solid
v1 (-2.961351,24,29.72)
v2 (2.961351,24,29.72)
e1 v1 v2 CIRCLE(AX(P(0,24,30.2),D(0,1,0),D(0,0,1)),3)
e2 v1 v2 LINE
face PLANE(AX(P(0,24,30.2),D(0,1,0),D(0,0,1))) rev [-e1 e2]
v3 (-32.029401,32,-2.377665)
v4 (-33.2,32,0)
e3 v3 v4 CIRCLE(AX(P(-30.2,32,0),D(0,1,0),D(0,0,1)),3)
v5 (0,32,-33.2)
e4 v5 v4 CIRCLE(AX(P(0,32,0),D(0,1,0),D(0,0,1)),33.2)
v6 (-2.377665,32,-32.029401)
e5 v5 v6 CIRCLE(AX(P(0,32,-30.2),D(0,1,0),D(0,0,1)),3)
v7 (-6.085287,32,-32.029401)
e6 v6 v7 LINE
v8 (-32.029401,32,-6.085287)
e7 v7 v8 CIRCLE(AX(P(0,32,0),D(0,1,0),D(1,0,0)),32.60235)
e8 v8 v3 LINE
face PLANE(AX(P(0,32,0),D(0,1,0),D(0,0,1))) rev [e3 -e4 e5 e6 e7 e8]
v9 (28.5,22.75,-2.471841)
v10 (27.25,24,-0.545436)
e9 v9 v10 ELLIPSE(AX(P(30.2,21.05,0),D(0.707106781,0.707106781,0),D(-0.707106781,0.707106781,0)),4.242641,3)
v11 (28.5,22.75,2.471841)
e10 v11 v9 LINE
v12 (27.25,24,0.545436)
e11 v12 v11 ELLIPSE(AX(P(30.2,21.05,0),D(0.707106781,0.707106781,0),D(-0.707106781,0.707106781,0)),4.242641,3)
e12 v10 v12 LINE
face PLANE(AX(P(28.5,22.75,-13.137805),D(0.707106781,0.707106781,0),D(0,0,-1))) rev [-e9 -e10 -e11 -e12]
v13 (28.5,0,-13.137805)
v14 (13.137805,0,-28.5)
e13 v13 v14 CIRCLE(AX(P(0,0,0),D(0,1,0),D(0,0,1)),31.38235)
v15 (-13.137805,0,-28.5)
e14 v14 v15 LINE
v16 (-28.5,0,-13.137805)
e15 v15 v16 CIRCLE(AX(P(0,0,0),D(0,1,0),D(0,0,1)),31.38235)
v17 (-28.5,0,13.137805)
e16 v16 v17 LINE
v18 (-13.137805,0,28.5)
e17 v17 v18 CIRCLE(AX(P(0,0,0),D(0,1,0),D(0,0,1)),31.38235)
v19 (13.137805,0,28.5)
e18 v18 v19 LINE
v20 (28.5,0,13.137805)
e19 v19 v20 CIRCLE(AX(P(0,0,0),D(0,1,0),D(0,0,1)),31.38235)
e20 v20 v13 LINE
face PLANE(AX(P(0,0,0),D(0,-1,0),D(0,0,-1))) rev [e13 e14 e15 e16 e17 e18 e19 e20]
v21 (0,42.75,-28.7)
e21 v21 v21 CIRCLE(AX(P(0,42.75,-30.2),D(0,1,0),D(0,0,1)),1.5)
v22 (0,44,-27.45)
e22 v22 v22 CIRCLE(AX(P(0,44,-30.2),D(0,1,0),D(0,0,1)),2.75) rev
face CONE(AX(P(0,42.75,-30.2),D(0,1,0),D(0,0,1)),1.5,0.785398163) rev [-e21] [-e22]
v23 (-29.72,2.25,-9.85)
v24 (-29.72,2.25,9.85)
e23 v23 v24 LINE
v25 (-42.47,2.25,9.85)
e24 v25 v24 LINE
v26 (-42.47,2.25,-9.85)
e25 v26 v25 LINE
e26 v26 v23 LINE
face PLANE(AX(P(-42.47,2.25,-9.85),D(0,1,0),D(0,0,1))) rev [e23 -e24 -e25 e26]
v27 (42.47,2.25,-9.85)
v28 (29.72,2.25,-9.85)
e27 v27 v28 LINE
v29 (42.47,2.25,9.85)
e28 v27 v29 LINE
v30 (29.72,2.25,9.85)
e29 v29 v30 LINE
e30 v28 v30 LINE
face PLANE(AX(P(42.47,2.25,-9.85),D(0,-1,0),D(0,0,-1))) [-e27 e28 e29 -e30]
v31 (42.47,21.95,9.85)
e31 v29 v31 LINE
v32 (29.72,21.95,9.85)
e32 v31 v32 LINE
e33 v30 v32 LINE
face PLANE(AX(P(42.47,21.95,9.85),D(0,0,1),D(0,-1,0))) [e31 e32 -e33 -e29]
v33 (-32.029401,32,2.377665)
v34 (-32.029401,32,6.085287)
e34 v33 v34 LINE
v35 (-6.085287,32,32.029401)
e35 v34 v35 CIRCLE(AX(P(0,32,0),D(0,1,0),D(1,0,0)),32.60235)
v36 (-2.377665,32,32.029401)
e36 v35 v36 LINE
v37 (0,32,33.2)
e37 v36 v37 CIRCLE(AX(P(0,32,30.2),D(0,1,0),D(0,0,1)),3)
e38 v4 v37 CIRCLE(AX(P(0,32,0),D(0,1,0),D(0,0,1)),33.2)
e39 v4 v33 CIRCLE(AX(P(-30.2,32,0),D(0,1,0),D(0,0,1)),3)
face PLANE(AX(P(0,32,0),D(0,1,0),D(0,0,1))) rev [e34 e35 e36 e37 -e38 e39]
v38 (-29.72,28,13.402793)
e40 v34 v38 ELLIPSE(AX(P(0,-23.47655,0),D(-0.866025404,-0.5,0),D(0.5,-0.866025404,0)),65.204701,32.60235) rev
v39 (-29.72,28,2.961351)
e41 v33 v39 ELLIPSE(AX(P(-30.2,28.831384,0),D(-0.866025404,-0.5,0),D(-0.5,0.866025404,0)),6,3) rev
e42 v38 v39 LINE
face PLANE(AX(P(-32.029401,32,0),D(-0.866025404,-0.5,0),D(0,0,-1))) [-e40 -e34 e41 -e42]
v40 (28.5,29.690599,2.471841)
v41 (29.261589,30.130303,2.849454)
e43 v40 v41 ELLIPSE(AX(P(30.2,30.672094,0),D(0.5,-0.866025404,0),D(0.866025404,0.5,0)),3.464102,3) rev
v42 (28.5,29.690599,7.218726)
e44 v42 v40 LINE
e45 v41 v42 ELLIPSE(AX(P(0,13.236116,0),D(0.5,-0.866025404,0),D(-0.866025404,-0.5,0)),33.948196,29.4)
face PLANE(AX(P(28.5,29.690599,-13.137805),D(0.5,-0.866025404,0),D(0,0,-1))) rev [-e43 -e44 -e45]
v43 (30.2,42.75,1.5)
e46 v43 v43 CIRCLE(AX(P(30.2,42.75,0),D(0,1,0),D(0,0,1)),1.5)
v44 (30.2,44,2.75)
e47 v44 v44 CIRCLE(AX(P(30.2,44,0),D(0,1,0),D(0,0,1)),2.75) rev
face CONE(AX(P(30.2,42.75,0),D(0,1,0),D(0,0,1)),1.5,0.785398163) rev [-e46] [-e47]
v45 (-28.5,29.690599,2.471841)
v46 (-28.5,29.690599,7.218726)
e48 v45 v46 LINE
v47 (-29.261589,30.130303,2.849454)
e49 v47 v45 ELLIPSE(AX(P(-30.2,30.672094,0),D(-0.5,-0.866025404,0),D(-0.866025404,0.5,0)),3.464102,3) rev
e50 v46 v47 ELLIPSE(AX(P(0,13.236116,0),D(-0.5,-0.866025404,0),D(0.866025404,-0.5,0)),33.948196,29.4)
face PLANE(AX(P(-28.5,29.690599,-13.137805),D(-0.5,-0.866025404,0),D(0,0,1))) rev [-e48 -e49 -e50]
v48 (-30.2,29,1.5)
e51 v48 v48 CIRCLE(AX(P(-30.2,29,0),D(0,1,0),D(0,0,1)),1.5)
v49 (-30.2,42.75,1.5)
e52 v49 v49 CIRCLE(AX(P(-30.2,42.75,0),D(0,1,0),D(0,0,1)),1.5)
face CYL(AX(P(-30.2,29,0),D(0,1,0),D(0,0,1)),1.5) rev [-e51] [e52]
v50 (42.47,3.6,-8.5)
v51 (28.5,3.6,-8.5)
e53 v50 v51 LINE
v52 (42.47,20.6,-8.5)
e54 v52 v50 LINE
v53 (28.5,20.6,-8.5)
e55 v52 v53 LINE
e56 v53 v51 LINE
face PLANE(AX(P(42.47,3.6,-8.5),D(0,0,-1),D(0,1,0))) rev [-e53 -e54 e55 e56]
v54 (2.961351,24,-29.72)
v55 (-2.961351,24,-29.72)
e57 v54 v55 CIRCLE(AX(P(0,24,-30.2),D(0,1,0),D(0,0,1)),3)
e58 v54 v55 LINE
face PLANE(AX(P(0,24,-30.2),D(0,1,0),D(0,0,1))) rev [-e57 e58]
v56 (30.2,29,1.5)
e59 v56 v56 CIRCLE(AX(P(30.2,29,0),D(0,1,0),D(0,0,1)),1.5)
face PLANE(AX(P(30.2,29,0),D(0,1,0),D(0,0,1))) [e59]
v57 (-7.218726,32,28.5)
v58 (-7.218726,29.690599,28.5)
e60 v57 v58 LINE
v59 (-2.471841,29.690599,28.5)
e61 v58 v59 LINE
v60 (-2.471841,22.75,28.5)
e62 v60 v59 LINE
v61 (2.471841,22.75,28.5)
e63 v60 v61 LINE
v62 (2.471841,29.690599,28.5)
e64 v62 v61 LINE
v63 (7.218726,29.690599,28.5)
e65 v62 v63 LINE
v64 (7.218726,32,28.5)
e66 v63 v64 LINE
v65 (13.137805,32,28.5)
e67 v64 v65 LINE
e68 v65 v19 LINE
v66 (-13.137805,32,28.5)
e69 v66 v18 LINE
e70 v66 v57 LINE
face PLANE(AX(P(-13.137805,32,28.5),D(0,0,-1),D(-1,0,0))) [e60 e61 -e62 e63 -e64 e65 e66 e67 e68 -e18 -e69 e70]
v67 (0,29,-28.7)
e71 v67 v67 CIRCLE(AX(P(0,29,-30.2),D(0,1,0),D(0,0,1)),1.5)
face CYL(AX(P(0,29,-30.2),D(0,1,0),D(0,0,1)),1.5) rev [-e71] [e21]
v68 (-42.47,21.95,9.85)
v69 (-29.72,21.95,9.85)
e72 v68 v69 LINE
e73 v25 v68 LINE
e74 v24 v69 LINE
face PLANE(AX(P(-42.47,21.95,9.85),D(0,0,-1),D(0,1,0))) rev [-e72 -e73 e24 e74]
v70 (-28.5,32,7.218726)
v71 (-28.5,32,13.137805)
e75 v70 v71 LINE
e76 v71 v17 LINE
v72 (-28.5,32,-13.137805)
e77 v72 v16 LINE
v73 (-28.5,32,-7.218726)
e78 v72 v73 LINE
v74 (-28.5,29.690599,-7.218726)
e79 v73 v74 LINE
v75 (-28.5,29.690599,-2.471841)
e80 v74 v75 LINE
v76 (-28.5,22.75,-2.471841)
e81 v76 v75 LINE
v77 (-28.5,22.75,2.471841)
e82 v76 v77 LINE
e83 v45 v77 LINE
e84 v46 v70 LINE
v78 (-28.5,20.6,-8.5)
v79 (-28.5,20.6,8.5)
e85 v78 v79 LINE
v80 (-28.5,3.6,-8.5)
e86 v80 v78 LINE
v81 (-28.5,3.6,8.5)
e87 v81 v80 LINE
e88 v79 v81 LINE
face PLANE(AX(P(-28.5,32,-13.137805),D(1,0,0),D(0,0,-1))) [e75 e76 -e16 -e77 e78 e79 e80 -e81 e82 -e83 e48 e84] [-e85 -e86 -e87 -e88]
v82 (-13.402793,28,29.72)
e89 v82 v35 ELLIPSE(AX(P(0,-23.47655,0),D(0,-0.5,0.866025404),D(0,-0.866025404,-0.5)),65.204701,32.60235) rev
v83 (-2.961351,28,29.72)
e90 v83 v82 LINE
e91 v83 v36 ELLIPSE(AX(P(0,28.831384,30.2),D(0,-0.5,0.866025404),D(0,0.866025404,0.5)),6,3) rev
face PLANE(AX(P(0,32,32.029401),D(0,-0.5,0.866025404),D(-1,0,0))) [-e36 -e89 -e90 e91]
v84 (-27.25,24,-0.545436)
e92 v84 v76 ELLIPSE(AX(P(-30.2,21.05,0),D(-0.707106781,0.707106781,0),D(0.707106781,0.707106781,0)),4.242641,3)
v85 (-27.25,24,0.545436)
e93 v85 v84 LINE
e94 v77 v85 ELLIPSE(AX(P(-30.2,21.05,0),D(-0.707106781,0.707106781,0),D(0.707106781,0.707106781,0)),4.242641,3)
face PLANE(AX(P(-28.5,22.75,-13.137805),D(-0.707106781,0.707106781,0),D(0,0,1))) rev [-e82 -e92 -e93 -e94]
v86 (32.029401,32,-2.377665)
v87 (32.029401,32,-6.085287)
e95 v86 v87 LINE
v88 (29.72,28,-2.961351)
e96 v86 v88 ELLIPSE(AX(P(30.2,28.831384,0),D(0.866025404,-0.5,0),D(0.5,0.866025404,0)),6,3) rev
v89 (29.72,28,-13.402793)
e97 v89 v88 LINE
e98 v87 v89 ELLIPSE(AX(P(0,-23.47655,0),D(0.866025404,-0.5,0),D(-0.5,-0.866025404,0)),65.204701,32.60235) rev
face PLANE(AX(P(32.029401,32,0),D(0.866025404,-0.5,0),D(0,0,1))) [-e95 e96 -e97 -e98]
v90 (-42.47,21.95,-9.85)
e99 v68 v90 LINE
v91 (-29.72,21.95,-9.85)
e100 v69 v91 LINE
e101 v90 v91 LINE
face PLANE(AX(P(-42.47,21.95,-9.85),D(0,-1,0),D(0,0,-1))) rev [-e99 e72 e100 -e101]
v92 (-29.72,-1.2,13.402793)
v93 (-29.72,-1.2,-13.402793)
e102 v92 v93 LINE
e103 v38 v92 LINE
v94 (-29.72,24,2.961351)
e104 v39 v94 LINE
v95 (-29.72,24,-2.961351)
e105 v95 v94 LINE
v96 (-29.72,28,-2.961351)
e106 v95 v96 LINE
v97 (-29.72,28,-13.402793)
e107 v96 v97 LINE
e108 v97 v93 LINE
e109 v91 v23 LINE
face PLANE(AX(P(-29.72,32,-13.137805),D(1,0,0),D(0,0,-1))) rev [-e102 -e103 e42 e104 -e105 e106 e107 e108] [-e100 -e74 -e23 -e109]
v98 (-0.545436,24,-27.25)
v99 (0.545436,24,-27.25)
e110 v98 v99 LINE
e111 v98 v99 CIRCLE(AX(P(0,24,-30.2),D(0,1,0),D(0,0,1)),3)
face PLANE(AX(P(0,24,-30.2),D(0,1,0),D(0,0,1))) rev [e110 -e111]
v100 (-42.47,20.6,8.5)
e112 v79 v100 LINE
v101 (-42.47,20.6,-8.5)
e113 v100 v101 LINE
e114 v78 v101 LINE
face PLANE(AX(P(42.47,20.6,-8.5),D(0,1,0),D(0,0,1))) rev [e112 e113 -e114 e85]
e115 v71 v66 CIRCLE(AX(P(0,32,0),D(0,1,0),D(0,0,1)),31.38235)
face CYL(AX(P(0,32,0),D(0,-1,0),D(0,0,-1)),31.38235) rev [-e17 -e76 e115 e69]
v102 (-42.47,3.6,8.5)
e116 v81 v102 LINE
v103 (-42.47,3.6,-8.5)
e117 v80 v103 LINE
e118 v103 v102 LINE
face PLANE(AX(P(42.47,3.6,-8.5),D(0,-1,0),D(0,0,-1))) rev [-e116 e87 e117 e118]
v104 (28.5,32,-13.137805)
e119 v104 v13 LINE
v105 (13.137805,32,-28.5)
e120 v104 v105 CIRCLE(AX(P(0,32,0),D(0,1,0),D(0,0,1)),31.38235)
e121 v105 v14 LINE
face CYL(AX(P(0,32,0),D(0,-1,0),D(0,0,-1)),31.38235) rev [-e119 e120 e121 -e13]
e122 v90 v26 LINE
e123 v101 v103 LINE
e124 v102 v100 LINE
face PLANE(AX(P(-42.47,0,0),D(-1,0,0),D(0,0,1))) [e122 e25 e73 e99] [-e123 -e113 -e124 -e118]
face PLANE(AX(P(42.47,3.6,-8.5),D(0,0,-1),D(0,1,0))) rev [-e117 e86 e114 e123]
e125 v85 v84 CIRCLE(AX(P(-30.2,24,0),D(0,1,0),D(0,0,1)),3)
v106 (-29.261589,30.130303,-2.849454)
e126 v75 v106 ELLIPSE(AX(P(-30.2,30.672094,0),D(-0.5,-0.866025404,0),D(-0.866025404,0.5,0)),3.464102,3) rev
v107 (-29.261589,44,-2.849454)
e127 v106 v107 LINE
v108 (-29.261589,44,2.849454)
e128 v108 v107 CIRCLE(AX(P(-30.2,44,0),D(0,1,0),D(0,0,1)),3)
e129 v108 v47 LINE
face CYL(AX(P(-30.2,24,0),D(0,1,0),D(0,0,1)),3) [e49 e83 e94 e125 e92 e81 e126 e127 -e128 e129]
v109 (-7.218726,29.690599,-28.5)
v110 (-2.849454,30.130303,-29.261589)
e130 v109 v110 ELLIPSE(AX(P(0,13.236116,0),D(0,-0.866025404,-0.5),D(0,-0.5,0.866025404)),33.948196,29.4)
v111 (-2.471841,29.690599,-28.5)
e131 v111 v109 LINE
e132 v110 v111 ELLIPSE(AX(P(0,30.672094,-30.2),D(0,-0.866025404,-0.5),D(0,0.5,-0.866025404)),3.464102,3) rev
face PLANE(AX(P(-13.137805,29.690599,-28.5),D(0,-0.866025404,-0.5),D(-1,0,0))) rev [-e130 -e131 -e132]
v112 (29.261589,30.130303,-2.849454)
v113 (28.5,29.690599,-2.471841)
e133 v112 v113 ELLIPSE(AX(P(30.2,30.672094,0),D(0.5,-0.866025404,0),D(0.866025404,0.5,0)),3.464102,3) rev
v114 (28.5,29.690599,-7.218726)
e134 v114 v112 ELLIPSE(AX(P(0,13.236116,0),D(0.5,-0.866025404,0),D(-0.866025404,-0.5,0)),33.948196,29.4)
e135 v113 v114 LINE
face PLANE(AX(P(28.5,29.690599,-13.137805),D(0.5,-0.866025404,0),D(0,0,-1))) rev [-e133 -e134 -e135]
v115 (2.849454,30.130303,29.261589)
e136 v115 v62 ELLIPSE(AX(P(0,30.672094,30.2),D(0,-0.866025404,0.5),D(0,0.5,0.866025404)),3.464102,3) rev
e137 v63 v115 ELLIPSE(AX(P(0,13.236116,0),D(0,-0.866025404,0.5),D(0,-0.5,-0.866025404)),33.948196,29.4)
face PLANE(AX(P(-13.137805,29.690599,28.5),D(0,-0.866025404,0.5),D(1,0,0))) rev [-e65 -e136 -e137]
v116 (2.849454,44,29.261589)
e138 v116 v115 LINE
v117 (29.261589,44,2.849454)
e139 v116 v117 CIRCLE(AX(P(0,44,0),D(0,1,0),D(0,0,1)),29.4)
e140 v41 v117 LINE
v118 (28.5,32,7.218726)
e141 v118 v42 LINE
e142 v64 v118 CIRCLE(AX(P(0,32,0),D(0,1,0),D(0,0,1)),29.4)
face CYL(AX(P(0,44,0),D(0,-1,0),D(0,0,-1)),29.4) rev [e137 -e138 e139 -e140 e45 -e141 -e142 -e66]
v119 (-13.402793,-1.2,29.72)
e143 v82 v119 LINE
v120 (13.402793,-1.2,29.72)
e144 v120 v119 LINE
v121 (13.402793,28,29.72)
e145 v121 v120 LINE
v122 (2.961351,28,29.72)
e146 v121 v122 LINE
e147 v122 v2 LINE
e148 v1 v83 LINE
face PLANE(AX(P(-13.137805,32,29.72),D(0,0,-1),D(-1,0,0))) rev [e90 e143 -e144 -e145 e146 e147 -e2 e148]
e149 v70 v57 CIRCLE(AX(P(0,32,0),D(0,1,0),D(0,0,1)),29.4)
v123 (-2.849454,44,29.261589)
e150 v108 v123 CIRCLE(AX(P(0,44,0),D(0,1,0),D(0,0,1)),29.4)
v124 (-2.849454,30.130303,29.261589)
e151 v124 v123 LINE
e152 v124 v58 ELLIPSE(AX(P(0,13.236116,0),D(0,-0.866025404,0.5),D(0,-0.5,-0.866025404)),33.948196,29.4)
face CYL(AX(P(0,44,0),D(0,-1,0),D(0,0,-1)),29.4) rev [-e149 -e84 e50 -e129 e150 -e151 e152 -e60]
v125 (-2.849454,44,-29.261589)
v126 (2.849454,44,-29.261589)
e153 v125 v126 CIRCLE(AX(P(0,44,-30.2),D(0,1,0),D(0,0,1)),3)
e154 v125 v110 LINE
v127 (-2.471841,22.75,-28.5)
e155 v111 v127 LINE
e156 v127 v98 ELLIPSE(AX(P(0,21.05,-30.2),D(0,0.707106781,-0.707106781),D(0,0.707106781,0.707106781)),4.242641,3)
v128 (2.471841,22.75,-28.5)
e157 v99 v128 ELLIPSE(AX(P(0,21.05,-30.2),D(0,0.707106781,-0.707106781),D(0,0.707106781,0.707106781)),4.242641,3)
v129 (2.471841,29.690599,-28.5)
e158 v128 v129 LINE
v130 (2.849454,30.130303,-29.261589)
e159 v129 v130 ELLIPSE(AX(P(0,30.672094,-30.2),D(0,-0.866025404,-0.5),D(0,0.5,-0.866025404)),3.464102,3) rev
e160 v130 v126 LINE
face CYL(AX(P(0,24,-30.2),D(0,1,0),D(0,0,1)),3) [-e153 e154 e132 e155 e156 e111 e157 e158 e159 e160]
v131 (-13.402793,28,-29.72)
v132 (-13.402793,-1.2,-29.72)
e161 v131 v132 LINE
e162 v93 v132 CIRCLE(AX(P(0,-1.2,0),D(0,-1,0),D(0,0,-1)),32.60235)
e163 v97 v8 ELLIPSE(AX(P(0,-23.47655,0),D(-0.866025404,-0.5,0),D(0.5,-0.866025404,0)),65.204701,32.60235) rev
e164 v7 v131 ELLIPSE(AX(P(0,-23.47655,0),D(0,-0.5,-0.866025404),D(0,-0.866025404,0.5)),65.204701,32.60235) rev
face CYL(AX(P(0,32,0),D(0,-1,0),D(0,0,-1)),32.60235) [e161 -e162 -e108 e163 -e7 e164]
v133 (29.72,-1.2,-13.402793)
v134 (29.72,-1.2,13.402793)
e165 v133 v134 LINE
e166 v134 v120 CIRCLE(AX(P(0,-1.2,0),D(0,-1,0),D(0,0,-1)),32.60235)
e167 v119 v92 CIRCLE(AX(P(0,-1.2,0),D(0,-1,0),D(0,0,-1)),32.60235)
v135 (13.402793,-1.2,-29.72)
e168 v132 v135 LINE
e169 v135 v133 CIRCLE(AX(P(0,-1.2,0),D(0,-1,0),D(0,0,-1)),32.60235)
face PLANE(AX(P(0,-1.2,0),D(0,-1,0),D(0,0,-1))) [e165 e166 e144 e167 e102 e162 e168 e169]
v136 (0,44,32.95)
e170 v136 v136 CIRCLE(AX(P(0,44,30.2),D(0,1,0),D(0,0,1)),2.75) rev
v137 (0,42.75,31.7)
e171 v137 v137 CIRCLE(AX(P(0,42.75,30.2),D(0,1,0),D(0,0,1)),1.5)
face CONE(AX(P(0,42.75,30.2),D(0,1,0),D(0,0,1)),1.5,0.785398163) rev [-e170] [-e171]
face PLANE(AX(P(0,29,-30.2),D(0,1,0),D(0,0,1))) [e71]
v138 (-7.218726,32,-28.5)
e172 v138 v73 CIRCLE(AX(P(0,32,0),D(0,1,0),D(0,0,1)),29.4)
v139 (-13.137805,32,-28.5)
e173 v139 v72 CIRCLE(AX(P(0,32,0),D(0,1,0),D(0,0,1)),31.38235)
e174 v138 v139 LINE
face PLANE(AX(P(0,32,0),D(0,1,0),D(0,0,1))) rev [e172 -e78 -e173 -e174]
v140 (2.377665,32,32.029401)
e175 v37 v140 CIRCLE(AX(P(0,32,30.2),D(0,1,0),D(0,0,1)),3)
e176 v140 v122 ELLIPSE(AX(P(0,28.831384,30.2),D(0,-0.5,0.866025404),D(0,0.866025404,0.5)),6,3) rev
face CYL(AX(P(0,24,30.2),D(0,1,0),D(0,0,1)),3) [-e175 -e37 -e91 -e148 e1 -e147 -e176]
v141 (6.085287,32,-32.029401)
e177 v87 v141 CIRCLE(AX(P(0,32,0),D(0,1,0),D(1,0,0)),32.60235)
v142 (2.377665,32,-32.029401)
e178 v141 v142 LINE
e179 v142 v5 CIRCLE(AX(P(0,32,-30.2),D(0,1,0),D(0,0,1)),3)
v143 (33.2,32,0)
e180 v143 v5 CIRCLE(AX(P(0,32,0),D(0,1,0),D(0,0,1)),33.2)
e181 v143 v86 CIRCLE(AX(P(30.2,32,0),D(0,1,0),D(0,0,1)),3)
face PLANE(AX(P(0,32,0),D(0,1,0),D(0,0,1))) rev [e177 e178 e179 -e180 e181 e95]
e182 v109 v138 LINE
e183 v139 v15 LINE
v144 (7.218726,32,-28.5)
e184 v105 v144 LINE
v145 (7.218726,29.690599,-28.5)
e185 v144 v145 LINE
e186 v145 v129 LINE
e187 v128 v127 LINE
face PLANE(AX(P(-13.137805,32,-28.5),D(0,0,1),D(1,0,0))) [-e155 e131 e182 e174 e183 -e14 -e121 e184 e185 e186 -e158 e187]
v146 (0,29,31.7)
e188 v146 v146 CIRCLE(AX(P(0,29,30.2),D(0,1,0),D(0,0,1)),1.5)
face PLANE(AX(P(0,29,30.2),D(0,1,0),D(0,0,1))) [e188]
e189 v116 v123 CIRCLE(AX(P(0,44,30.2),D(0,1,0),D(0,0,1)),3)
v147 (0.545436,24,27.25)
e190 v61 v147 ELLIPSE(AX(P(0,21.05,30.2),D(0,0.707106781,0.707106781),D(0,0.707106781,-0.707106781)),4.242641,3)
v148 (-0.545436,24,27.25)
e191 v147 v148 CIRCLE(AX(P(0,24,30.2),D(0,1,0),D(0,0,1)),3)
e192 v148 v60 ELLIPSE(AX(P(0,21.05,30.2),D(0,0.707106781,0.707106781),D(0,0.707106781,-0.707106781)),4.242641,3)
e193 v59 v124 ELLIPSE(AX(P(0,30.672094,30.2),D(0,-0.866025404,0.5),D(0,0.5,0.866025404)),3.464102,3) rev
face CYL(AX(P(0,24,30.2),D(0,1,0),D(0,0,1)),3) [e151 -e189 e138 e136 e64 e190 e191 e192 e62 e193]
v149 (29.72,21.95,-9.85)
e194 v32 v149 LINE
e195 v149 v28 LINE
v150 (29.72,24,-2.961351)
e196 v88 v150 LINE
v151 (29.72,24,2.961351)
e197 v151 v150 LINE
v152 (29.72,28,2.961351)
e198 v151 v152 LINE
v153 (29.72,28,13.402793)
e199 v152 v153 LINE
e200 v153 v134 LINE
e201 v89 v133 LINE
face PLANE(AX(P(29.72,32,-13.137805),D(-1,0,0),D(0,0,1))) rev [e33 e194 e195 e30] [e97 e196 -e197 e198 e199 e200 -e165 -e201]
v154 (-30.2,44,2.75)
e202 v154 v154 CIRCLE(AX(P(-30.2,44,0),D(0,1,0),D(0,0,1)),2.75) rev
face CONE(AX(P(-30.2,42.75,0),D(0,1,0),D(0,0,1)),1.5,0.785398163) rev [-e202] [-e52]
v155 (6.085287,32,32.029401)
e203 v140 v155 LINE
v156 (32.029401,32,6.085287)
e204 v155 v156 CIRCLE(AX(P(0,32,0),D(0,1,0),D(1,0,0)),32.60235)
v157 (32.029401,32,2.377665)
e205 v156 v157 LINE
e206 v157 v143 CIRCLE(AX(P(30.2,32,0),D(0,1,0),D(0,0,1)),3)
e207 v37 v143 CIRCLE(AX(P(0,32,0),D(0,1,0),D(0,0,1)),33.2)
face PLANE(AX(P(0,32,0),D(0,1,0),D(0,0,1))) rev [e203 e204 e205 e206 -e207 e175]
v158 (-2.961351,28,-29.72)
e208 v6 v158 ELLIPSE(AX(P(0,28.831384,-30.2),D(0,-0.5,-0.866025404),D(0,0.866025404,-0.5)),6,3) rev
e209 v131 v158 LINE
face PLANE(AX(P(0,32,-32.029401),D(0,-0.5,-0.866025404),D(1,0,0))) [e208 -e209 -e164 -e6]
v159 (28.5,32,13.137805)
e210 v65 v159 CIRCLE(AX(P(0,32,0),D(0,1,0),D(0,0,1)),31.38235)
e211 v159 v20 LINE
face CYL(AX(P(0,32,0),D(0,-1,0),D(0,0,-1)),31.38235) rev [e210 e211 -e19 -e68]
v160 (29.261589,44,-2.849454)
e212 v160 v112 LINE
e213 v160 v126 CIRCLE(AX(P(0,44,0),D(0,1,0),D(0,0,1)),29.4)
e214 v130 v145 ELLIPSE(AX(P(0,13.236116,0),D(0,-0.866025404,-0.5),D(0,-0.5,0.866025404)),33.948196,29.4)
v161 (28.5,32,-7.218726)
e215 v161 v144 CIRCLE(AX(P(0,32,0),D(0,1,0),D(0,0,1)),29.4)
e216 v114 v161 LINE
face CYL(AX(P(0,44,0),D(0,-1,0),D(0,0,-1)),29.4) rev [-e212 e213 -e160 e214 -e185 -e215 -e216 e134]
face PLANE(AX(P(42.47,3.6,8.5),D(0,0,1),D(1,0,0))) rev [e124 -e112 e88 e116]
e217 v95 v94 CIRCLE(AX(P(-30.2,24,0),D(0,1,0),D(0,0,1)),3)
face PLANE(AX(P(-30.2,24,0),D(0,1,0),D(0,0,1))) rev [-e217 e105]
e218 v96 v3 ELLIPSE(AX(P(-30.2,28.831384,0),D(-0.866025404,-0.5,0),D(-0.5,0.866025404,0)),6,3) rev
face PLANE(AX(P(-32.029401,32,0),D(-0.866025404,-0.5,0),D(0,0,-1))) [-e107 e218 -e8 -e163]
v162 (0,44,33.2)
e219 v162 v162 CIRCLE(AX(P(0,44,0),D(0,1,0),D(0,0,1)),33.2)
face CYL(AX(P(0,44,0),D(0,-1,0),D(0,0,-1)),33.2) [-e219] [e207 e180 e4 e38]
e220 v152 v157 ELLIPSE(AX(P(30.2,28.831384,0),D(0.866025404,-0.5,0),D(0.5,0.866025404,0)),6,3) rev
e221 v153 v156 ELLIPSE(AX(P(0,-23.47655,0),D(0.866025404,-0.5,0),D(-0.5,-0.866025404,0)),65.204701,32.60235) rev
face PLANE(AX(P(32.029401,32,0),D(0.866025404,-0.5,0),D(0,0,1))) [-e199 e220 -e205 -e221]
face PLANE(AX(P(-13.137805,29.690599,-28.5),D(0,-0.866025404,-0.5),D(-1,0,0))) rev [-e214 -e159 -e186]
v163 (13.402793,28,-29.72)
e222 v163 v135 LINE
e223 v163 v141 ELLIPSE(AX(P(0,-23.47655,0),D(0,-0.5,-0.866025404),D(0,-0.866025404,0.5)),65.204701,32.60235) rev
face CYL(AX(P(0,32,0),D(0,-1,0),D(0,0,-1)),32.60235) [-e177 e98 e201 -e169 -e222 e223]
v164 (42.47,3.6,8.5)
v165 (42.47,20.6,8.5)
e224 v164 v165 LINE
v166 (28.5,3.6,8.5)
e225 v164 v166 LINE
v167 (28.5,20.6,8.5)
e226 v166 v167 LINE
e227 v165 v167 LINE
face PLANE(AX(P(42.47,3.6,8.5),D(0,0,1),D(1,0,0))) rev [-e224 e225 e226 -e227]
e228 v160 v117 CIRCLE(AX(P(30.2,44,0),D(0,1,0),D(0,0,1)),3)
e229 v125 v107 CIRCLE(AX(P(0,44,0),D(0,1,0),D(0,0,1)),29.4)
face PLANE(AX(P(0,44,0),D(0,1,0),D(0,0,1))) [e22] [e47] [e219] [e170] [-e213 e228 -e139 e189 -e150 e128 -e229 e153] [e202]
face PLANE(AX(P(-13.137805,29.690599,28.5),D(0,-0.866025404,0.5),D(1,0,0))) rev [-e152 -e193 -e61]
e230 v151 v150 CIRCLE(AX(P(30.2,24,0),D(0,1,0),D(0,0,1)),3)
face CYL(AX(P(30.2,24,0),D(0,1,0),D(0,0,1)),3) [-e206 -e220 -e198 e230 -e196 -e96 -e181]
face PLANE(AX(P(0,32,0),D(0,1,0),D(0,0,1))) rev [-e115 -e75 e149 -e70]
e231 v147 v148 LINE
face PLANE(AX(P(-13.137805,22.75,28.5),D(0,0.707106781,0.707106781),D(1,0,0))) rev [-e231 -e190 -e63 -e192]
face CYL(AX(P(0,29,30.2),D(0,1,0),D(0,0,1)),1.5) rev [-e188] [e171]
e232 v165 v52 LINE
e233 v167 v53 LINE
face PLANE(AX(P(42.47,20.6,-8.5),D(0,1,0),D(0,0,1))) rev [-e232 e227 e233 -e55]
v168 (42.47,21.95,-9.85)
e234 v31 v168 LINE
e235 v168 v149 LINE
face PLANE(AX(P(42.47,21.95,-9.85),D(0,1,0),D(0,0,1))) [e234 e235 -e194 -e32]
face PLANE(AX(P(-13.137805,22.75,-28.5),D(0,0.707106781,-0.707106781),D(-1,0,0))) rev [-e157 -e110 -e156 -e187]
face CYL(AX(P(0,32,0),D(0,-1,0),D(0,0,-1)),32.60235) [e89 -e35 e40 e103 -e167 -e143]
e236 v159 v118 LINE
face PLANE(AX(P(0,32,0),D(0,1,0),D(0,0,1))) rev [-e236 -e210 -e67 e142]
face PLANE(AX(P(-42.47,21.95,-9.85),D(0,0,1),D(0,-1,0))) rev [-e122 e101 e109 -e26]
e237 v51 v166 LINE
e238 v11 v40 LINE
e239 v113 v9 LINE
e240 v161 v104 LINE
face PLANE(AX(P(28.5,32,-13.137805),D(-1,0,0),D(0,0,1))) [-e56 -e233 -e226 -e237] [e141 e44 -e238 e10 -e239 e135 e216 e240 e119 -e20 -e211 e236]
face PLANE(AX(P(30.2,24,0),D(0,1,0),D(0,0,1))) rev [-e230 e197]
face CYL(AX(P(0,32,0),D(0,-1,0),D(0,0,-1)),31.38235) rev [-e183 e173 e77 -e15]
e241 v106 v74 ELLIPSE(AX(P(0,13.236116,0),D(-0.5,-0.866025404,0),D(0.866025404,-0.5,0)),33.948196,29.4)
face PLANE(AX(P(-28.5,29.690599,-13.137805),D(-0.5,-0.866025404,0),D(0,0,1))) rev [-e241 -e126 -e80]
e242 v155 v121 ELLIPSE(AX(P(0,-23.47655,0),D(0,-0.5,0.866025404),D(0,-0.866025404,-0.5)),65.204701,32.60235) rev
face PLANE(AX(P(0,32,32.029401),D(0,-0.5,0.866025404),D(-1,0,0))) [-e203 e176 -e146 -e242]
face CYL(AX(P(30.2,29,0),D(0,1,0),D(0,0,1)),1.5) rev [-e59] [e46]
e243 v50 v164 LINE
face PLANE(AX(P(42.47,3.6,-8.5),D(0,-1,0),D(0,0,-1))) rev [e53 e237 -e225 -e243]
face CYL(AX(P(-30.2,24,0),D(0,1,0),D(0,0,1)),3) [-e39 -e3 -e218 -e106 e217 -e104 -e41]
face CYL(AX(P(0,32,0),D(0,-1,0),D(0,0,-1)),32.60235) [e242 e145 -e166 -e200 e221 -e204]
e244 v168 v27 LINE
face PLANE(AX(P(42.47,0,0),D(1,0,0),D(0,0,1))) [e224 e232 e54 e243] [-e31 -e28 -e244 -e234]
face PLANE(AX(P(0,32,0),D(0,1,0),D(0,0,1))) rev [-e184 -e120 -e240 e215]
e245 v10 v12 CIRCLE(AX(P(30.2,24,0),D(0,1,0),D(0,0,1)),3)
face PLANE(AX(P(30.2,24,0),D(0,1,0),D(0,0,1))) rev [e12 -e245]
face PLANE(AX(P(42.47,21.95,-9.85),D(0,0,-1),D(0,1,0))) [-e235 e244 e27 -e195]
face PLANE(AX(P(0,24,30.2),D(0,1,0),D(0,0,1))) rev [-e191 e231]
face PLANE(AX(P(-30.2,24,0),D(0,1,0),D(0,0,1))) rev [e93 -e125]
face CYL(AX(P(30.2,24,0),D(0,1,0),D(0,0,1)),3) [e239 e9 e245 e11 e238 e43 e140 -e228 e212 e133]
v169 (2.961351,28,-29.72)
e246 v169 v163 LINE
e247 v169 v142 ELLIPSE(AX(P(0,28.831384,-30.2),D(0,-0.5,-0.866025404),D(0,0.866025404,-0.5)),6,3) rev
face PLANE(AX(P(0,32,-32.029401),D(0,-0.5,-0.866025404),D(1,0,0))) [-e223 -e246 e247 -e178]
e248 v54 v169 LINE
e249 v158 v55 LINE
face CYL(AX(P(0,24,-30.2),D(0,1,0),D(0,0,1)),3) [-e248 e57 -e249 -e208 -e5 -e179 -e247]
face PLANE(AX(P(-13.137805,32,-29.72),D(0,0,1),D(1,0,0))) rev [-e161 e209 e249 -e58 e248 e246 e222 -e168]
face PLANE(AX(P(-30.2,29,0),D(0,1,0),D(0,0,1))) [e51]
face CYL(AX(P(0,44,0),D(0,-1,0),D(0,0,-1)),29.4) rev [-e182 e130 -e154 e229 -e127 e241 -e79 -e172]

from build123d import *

# Parameters (mm, degrees)
EXTRUDE_THIN1_DEPTH     = 32
SKETCH2_R               = 33.2
SKETCH2_R_2             = 29.4
BOSS_EXTRUDE1_DEPTH     = 12
CHAMFER1_SIZE           = 4
CHAMFER1_SIZE_2         = 2.309401077
SKETCH3_R               = 3
BOSS_EXTRUDE2_DEPTH     = 20
CHAMFER2_SIZE           = 1.25
SKETCH5_W               = 19.7
SKETCH5_H               = 19.7
BOSS_EXTRUDE3_DEPTH     = 12.75
CUT_EXTRUDE1_DEPTH      = 102.25731381
CUT_EXTRUDE1_DEPTH_BACK = 102.25731381
SKETCH6_W               = 17
SKETCH6_H               = 17
BOSS_EXTRUDE4_START     = 1.2
BOSS_EXTRUDE4_DEPTH     = 1.2
SKETCH8_R               = 1.5
CUT_EXTRUDE2_DEPTH      = 15
CHAMFER3_SIZE           = 1.25


with BuildPart() as part:
    # Sketch1 → Extrude-Thin1 (new body)
    with BuildSketch(Plane(origin=(0, 0, 0), x_dir=(1, 0, 0), z_dir=(0, 1, 0))):
        with BuildLine():
            Line((29.72, 13.402792694), (29.72, -13.402792694))
            ThreePointArc((29.72, -13.402792694), (23.053343055, -23.053343055), (13.402792694, -29.72))
            Line((13.402792694, -29.72), (-13.402792694, -29.72))
            ThreePointArc((-13.402792694, -29.72), (-23.053343055, -23.053343055), (-29.72, -13.402792694))
            Line((-29.72, -13.402792694), (-29.72, 13.402792694))
            ThreePointArc((-29.72, 13.402792694), (-23.053343055, 23.053343055), (-13.402792694, 29.72))
            Line((-13.402792694, 29.72), (13.402792694, 29.72))
            ThreePointArc((13.402792694, 29.72), (23.053343055, 23.053343055), (29.72, 13.402792694))
        make_face()
        with BuildLine():
            Line((28.5, 13.137804878), (28.5, -13.137804878))
            ThreePointArc((28.5, -13.137804878), (22.190672782, -22.190672782), (13.137804878, -28.5))
            Line((13.137804878, -28.5), (-13.137804878, -28.5))
            ThreePointArc((-13.137804878, -28.5), (-22.190672782, -22.190672782), (-28.5, -13.137804878))
            Line((-28.5, -13.137804878), (-28.5, 13.137804878))
            ThreePointArc((-28.5, 13.137804878), (-22.190672782, 22.190672782), (-13.137804878, 28.5))
            Line((-13.137804878, 28.5), (13.137804878, 28.5))
            ThreePointArc((13.137804878, 28.5), (22.190672782, 22.190672782), (28.5, 13.137804878))
        make_face(mode=Mode.SUBTRACT)
    extrude(amount=EXTRUDE_THIN1_DEPTH)

    # Sketch2 → Boss-Extrude1 (add)
    with BuildSketch(Plane(origin=(0, 32, 0), x_dir=(1, 0, 0), z_dir=(0, 1, 0))):
        with Locations(Location((0, 0, 0), (0, 0, 270))):
            Circle(SKETCH2_R)
        with Locations(Location((0, 0, 0), (0, 0, 75.786553976))):
            Circle(SKETCH2_R_2, mode=Mode.SUBTRACT)
    extrude(amount=BOSS_EXTRUDE1_DEPTH)

    # Chamfer1
    # the kernel refuses this chamfer: 4, 2.309401077 mm, written as the material it adds along each edge
    with BuildSketch(Plane(origin=(-23.751135713, 32, -29.72), x_dir=(0, -0.9998132206222079, 0.01932676561270115), z_dir=(1, 0, 0))) as chamfer1_piece_1_section:
        Polygon((CHAMFER1_SIZE * 0.999813220622, CHAMFER1_SIZE * 0.0193267656127), (-CHAMFER1_SIZE_2 * 0.0193267656107, CHAMFER1_SIZE_2 * 0.999813220518), (0, 0), align=None)
    chamfer1_piece_1 = extrude(amount=47.502271426, mode=Mode.PRIVATE)
    chamfer1_piece_1 = chamfer1_piece_1 & Plane(origin=(0, 30.60321443, 0), x_dir=(0.41109897069605716, 0, -0.9115907175331714), z_dir=(0, -1, 0)) * Cylinder(32.602350406, 112, mode=Mode.PRIVATE)
    add(chamfer1_piece_1)
    with BuildSketch(Plane(origin=(-29.72, 32, 23.751135713), x_dir=(-0.9983227437537925, 0.05789386240267119, 0), z_dir=(0, 0, -1))) as chamfer1_piece_2_section:
        Polygon((CHAMFER1_SIZE_2 * 0.998322743649, -CHAMFER1_SIZE_2 * 0.0578938623966), (-CHAMFER1_SIZE * 0.0578938624027, -CHAMFER1_SIZE * 0.998322743754), (0, 0), align=None)
    chamfer1_piece_2 = extrude(amount=47.502271426, mode=Mode.PRIVATE)
    chamfer1_piece_2 = chamfer1_piece_2 & Plane(origin=(0, 30.60321443, 0), x_dir=(-0.9115907175331723, 0, -0.41109897069605533), z_dir=(0, -1, 0)) * Cylinder(32.602350406, 111, mode=Mode.PRIVATE)
    add(chamfer1_piece_2)
    with BuildSketch(Plane(origin=(23.751135713, 32, 29.72), x_dir=(0, 0.0578938624026711, 0.9983227437537925), z_dir=(-1, 0, 0))) as chamfer1_piece_3_section:
        Polygon((CHAMFER1_SIZE_2 * 0.998322743649, -CHAMFER1_SIZE_2 * 0.0578938623966), (-CHAMFER1_SIZE * 0.0578938624027, -CHAMFER1_SIZE * 0.998322743754), (0, 0), align=None)
    chamfer1_piece_3 = extrude(amount=47.502271426, mode=Mode.PRIVATE)
    chamfer1_piece_3 = chamfer1_piece_3 & Plane(origin=(0, 30.60321443, 0), x_dir=(0.9115907175331722, 0, 0.4110989706960556), z_dir=(0, -1, 0)) * Cylinder(32.602350406, 111, mode=Mode.PRIVATE)
    add(chamfer1_piece_3)
    with BuildSketch(Plane(origin=(29.72, 32, -23.751135713), x_dir=(-0.01932676561270115, -0.9998132206222079, 0), z_dir=(0, 0, 1))) as chamfer1_piece_4_section:
        Polygon((CHAMFER1_SIZE * 0.999813220622, CHAMFER1_SIZE * 0.0193267656127), (-CHAMFER1_SIZE_2 * 0.0193267656107, CHAMFER1_SIZE_2 * 0.999813220518), (0, 0), align=None)
    chamfer1_piece_4 = extrude(amount=47.502271426, mode=Mode.PRIVATE)
    chamfer1_piece_4 = chamfer1_piece_4 & Plane(origin=(0, 30.60321443, 0), x_dir=(0.41109897069605716, 0, -0.9115907175331714), z_dir=(0, -1, 0)) * Cylinder(32.602350406, 112, mode=Mode.PRIVATE)
    add(chamfer1_piece_4)
    # the kernel refuses this chamfer: 4, 2.309401077 mm, written as the material it takes off along each edge
    with BuildSketch(Plane(origin=(-17.567068668, 32, -28.5), x_dir=(0, 0.019326765612700306, -0.9998132206222079), z_dir=(1, 0, 0))) as chamfer1_2_piece_1_section:
        Polygon((CHAMFER1_SIZE * 0.999813220622, -CHAMFER1_SIZE * 0.0193267656127), (-CHAMFER1_SIZE_2 * 0.0193267656107, -CHAMFER1_SIZE_2 * 0.999813220518), (0, 0), align=None)
    chamfer1_2_piece_1 = extrude(amount=35.134137336, mode=Mode.PRIVATE)
    chamfer1_2_piece_1 = chamfer1_2_piece_1 & Plane(origin=(0, 30.944951594, 0), x_dir=(0.2455348860263091, 0, -0.9693877551032133), z_dir=(0, -1, 0)) * Cylinder(29.4, 87, mode=Mode.PRIVATE)
    add(chamfer1_2_piece_1, mode=Mode.SUBTRACT)
    with BuildSketch(Plane(origin=(17.567068668, 32, 28.5), x_dir=(0, 0.01932676561270029, 0.9998132206222079), z_dir=(-1, 0, 0))) as chamfer1_2_piece_2_section:
        Polygon((CHAMFER1_SIZE * 0.999813220622, -CHAMFER1_SIZE * 0.0193267656127), (-CHAMFER1_SIZE_2 * 0.0193267656107, -CHAMFER1_SIZE_2 * 0.999813220518), (0, 0), align=None)
    chamfer1_2_piece_2 = extrude(amount=35.134137336, mode=Mode.PRIVATE)
    chamfer1_2_piece_2 = chamfer1_2_piece_2 & Plane(origin=(0, 30.944951594, 0), x_dir=(0.2455348860263091, 0, -0.9693877551032133), z_dir=(0, -1, 0)) * Cylinder(29.4, 87, mode=Mode.PRIVATE)
    add(chamfer1_2_piece_2, mode=Mode.SUBTRACT)
    with BuildSketch(Plane(origin=(-28.5, 32, 17.567068668), x_dir=(-0.9998132206222079, 0.019326765612700306, 0), z_dir=(0, 0, -1))) as chamfer1_2_piece_3_section:
        Polygon((CHAMFER1_SIZE * 0.999813220622, -CHAMFER1_SIZE * 0.0193267656127), (-CHAMFER1_SIZE_2 * 0.0193267656107, -CHAMFER1_SIZE_2 * 0.999813220518), (0, 0), align=None)
    chamfer1_2_piece_3 = extrude(amount=35.134137336, mode=Mode.PRIVATE)
    chamfer1_2_piece_3 = chamfer1_2_piece_3 & Plane(origin=(0, 30.944951594, 0), x_dir=(0.2455348860263091, 0, -0.9693877551032133), z_dir=(0, -1, 0)) * Cylinder(29.4, 87, mode=Mode.PRIVATE)
    add(chamfer1_2_piece_3, mode=Mode.SUBTRACT)
    with BuildSketch(Plane(origin=(28.5, 32, -17.567068668), x_dir=(-0.0578938624026711, -0.9983227437537925, 0), z_dir=(0, 0, 1))) as chamfer1_2_piece_4_section:
        Polygon((CHAMFER1_SIZE_2 * 0.998322743649, CHAMFER1_SIZE_2 * 0.0578938623966), (-CHAMFER1_SIZE * 0.0578938624027, CHAMFER1_SIZE * 0.998322743754), (0, 0), align=None)
    chamfer1_2_piece_4 = extrude(amount=35.134137336, mode=Mode.PRIVATE)
    chamfer1_2_piece_4 = chamfer1_2_piece_4 & Plane(origin=(0, 30.944951594, 0), x_dir=(0.2455348860263091, 0, -0.9693877551032133), z_dir=(0, -1, 0)) * Cylinder(29.4, 87, mode=Mode.PRIVATE)
    add(chamfer1_2_piece_4, mode=Mode.SUBTRACT)

    # Sketch3 → Boss-Extrude2 (add)
    with BuildSketch(Plane(origin=(0, 44, 0), x_dir=(1, 0, 0), z_dir=(0, 1, 0))):
        with Locations((0, 30.2)):
            Circle(SKETCH3_R)
        with Locations((30.2, 0)):
            Circle(SKETCH3_R)
        with Locations((0, -30.2)):
            Circle(SKETCH3_R)
        with Locations((-30.2, 0)):
            Circle(SKETCH3_R)
    extrude(amount=-BOSS_EXTRUDE2_DEPTH)

    # Chamfer2
    chamfer2_edges = [part.edges().sort_by_distance(p)[0] for p in [
        (0, 24, -28.5),
        (28.5, 24, 0),
        (0, 24, 28.5),
        (-28.5, 24, 0),
    ]]
    chamfer(chamfer2_edges, length=CHAMFER2_SIZE)

    # Sketch5 → Boss-Extrude3 (add)
    with BuildSketch(Plane.ZY.offset(29.72)):
        with Locations((0, 12.1)):
            Rectangle(SKETCH5_W, SKETCH5_H)
    boss_extrude3 = extrude(amount=BOSS_EXTRUDE3_DEPTH)

    # Mirror1: Boss-Extrude3 across plane
    add(boss_extrude3.mirror(Plane(origin=(0, 0, 0), x_dir=(0, 0, 1), z_dir=(1, 0, 0))))

    # Sketch6 → Cut-Extrude1 (cut, two sides: drawn at the far end of the back side and taken through both)
    with BuildSketch(Plane.ZY.offset(42.47).offset(-CUT_EXTRUDE1_DEPTH_BACK)):
        with Locations((0, 12.1)):
            Rectangle(SKETCH6_W, SKETCH6_H)
    extrude(amount=CUT_EXTRUDE1_DEPTH + CUT_EXTRUDE1_DEPTH_BACK, mode=Mode.SUBTRACT)

    # Sketch7 → Boss-Extrude4 (add)
    with BuildSketch(Plane.XZ.offset(BOSS_EXTRUDE4_START)):
        with BuildLine():
            Line((29.72, -13.402792694), (29.72, 13.402792694))
            ThreePointArc((29.72, 13.402792694), (23.053343055, 23.053343055), (13.402792694, 29.72))
            Line((13.402792694, 29.72), (-13.402792694, 29.72))
            ThreePointArc((-13.402792694, 29.72), (-23.053343055, 23.053343055), (-29.72, 13.402792694))
            Line((-29.72, 13.402792694), (-29.72, -13.402792694))
            ThreePointArc((-29.72, -13.402792694), (-23.053343055, -23.053343055), (-13.402792694, -29.72))
            Line((-13.402792694, -29.72), (13.402792694, -29.72))
            ThreePointArc((13.402792694, -29.72), (23.053343055, -23.053343055), (29.72, -13.402792694))
        make_face()
    extrude(amount=-BOSS_EXTRUDE4_DEPTH)

    # Sketch8 → Cut-Extrude2 (cut)
    with BuildSketch(Plane(origin=(0, 44, 0), x_dir=(1, 0, 0), z_dir=(0, 1, 0))):
        with Locations(Location((0, 30.2, 0), (0, 0, 270))):
            Circle(SKETCH8_R)
        with Locations(Location((30.2, 0, 0), (0, 0, 270))):
            Circle(SKETCH8_R)
        with Locations(Location((0, -30.2, 0), (0, 0, 270))):
            Circle(SKETCH8_R)
        with Locations(Location((-30.2, 0, 0), (0, 0, 270))):
            Circle(SKETCH8_R)
    extrude(amount=-CUT_EXTRUDE2_DEPTH, mode=Mode.SUBTRACT)

    # Chamfer3
    chamfer3_edges = [part.edges().sort_by_distance(p)[0] for p in [
        (0, 44, -31.7),
        (30.2, 44, -1.5),
        (0, 44, 28.7),
        (-30.2, 44, -1.5),
    ]]
    chamfer(chamfer3_edges, length=CHAMFER3_SIZE)


solid = part.part
